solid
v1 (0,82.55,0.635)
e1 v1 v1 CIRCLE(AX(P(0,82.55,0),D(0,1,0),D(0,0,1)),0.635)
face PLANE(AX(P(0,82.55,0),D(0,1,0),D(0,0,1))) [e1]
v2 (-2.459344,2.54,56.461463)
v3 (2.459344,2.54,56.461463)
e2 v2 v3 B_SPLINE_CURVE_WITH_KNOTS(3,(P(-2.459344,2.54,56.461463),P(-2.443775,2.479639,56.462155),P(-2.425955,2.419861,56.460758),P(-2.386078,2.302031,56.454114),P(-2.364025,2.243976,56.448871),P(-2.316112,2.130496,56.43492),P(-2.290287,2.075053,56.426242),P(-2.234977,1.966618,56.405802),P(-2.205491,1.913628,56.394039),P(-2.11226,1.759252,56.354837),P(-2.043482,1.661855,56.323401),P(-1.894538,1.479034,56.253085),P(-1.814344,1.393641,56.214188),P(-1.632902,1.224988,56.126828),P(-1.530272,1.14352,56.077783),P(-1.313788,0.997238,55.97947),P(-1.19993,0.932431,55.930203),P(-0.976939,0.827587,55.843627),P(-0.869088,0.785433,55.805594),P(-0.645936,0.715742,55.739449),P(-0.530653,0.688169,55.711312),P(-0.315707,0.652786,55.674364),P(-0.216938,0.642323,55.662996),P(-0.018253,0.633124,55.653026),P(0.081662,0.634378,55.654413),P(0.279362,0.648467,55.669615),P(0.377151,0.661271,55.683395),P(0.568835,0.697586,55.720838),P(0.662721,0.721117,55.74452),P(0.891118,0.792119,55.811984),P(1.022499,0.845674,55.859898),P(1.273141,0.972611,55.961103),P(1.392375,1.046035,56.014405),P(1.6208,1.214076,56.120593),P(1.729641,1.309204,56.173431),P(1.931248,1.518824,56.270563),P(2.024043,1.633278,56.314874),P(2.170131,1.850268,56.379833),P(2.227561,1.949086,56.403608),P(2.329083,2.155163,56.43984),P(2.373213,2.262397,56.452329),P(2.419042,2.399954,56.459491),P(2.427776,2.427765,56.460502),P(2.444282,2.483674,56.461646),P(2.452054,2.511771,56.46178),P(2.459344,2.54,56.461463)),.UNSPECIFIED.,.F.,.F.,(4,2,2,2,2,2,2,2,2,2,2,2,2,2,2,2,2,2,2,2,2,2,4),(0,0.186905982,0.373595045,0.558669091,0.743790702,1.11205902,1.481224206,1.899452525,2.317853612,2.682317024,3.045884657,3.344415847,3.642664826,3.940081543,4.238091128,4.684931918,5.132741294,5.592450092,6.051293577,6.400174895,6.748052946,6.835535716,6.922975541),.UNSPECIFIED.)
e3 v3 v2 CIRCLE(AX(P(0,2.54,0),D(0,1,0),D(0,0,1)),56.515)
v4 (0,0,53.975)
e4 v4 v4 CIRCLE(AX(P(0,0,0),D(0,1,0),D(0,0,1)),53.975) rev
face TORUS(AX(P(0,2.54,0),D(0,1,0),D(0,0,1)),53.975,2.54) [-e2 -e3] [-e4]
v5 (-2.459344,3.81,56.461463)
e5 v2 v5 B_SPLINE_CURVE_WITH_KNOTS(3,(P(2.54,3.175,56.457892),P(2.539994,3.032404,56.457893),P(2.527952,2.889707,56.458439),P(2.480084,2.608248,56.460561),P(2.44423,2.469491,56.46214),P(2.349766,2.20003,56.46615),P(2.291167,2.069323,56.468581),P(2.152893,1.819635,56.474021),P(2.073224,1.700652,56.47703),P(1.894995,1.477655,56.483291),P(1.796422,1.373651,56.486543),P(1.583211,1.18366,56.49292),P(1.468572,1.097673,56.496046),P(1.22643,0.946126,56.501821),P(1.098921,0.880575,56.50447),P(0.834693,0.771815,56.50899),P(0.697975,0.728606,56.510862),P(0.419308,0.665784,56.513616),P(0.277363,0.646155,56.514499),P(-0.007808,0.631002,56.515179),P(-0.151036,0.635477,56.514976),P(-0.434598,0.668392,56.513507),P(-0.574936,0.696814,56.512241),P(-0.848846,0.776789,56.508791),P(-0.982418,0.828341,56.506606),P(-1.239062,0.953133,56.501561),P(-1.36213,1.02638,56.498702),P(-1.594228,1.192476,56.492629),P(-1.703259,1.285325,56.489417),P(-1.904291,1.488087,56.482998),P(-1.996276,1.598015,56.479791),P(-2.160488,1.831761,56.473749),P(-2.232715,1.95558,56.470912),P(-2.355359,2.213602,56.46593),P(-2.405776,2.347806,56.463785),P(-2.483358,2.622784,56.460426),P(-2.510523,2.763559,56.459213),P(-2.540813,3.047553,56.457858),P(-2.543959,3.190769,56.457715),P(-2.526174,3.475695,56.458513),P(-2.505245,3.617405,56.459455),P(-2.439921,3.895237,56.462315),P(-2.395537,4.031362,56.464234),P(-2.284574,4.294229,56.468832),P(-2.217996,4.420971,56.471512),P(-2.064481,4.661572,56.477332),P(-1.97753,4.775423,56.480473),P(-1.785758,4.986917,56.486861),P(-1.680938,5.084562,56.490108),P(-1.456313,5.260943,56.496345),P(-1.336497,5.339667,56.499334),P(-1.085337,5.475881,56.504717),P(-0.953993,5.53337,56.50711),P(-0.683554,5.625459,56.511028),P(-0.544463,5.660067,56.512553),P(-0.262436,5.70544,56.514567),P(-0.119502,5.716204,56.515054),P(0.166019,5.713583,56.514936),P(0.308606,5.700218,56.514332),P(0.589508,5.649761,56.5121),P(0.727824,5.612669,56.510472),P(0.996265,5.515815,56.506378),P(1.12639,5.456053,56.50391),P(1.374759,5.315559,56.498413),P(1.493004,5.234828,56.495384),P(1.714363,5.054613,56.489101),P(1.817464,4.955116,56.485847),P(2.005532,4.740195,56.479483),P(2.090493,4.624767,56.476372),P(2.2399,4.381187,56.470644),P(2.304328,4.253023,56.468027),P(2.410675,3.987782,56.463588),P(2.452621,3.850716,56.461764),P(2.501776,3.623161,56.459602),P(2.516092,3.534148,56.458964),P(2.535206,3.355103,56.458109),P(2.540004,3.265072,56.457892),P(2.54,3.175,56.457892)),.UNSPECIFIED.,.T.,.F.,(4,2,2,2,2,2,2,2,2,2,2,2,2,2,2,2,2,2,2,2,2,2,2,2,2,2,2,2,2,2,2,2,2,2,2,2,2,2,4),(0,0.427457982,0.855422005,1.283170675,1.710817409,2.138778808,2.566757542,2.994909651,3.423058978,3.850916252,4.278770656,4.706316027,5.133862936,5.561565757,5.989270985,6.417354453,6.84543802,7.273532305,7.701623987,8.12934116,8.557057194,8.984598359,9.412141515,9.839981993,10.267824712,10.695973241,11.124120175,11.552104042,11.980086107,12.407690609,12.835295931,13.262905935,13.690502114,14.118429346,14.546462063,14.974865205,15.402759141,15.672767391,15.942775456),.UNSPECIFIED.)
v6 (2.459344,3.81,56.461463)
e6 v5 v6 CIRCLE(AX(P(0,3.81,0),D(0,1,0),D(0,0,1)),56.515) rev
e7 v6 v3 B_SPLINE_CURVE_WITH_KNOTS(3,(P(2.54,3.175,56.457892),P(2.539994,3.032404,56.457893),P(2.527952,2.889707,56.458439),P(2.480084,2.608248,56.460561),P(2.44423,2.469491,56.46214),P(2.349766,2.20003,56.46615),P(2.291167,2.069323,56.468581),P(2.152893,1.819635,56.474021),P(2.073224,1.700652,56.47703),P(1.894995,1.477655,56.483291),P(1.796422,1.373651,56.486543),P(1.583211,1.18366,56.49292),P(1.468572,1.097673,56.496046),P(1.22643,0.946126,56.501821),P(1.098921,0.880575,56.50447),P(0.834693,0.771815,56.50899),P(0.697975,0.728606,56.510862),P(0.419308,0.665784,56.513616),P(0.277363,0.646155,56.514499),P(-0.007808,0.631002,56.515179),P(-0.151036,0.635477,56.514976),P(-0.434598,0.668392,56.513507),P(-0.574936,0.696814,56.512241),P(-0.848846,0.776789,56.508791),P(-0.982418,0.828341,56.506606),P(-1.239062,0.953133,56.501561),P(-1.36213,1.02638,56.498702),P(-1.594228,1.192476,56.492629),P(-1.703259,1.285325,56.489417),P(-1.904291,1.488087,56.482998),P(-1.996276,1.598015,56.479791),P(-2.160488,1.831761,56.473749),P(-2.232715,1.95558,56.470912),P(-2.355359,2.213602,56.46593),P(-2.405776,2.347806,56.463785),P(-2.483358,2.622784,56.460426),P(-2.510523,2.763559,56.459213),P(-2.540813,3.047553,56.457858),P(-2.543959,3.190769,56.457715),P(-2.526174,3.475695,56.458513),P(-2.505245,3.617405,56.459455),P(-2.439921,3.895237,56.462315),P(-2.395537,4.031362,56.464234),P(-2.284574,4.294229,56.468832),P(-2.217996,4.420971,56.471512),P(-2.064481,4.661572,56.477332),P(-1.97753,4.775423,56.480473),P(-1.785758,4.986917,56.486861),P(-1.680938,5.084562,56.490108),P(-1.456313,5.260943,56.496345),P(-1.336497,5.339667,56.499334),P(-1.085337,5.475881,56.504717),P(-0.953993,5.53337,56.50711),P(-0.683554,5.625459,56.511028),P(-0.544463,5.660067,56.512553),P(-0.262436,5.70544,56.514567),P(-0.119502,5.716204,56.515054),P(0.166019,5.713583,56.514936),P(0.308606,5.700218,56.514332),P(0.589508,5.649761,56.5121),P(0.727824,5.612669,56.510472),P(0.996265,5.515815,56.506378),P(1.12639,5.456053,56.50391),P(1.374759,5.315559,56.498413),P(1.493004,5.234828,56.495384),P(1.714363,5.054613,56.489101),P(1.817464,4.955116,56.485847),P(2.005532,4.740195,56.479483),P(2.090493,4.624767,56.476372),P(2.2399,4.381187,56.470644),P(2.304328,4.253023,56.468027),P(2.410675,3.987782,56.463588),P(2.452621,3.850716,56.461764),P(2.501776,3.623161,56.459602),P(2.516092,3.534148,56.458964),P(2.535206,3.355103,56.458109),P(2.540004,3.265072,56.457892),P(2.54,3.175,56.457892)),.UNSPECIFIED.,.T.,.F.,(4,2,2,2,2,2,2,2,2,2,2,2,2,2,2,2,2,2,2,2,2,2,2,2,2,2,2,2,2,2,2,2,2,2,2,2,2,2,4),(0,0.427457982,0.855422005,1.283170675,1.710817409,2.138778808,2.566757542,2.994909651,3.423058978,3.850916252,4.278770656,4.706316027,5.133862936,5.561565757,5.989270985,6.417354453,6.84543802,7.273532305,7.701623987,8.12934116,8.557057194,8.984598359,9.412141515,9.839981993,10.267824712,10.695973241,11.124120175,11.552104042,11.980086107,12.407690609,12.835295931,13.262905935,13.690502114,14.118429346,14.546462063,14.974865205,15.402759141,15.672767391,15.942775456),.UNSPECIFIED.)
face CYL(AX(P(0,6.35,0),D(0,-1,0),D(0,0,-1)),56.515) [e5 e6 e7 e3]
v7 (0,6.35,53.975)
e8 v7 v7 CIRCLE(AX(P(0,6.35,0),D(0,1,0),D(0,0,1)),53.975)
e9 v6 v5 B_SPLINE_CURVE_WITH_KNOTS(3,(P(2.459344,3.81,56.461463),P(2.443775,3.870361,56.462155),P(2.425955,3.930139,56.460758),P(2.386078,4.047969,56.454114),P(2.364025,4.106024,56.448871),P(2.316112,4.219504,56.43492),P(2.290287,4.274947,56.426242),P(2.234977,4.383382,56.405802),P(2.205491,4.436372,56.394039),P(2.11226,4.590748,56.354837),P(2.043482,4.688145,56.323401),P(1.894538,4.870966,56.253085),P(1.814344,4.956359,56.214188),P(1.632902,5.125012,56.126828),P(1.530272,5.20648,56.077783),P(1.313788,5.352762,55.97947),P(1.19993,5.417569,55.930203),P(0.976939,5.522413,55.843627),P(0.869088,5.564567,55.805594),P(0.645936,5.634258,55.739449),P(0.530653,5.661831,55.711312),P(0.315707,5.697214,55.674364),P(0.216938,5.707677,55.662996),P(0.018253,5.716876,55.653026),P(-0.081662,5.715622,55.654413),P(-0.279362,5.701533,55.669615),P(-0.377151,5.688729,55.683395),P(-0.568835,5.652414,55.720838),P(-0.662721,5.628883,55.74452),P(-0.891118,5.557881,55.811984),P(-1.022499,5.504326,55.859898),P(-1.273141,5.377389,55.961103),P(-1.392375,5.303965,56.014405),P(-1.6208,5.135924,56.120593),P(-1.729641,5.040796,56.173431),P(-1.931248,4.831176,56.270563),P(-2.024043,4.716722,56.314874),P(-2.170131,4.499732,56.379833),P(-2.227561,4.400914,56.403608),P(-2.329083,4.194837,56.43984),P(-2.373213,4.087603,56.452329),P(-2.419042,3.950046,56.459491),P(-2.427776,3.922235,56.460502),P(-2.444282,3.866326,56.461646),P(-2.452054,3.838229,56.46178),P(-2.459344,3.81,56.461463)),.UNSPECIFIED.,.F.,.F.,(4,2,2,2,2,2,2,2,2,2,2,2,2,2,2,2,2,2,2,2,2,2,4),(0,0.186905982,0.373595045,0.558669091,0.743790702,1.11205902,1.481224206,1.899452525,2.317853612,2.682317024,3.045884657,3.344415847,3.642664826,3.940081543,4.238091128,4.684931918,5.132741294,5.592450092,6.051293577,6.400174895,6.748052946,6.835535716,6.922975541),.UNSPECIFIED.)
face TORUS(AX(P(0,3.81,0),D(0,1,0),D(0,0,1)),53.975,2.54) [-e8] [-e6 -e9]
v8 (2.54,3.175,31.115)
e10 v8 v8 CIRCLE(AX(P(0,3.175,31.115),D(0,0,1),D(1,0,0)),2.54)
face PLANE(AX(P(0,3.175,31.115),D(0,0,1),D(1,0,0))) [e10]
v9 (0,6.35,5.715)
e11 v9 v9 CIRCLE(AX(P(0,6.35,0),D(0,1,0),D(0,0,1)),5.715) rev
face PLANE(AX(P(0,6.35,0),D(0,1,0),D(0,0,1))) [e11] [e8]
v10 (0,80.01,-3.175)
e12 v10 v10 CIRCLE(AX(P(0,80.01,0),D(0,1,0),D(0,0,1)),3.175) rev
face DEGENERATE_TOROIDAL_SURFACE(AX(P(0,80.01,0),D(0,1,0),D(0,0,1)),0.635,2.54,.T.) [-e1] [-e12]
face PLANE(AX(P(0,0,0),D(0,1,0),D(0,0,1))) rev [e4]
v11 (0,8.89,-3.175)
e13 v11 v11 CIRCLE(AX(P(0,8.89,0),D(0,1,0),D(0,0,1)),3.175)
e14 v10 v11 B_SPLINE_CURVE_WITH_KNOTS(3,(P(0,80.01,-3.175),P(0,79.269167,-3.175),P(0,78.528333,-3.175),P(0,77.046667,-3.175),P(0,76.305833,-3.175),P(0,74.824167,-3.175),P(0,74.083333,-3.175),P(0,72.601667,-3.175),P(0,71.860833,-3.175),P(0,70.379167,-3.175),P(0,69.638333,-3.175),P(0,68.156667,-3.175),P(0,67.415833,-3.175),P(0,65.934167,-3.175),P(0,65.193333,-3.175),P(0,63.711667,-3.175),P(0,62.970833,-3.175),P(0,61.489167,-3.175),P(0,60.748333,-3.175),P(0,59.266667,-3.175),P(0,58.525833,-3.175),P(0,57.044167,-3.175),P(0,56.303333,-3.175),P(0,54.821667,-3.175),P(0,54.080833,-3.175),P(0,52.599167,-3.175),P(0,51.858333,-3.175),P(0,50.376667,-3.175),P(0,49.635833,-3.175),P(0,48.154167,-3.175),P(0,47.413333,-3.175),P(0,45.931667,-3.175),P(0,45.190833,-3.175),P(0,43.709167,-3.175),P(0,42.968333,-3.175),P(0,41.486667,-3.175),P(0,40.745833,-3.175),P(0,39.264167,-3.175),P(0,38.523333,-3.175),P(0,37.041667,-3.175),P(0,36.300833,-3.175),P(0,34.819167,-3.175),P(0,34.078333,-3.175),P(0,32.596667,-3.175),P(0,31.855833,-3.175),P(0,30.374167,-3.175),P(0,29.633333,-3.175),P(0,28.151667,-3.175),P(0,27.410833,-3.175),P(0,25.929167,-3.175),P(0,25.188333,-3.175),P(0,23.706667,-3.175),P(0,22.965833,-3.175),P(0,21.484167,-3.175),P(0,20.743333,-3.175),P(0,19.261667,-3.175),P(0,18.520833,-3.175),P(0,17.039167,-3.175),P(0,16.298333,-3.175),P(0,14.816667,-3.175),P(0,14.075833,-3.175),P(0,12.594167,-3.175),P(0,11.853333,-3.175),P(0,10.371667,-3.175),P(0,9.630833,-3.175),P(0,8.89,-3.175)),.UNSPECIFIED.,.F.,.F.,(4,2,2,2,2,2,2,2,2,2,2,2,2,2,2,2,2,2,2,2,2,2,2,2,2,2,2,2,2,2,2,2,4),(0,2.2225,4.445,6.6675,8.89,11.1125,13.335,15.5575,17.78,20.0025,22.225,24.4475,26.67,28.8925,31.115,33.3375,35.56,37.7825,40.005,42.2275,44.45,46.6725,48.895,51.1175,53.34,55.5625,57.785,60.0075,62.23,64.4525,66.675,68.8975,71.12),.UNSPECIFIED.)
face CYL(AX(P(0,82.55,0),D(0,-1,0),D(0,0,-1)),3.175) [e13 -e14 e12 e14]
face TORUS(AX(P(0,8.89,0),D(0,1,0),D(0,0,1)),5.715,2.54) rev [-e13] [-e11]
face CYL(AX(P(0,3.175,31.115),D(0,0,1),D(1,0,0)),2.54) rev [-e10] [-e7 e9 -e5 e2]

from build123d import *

# Parameters (mm, degrees)
SKETCH1_R           = 56.515
BOSS_EXTRUDE1_DEPTH = 6.35
SKETCH2_R           = 3.175
BOSS_EXTRUDE2_DEPTH = 76.2
SKETCH5_R           = 2.54
CUT_EXTRUDE1_DEPTH  = 25.4
FILLET2_R           = 2.54


with BuildPart() as part:
    # Sketch1 → Boss-Extrude1 (new body)
    with BuildSketch(Plane(origin=(0, 0, 0), x_dir=(1, 0, 0), z_dir=(0, 1, 0))):
        with Locations(Location((0, 0, 0), (0, 0, 270))):
            Circle(SKETCH1_R)
    extrude(amount=BOSS_EXTRUDE1_DEPTH)

    # Sketch2 → Boss-Extrude2 (add)
    with BuildSketch(Plane(origin=(0, 6.35, 0), x_dir=(1, 0, 0), z_dir=(0, 1, 0))):
        with Locations(Location((0, 0, 0), (0, 0, 90))):
            Circle(SKETCH2_R)
    extrude(amount=BOSS_EXTRUDE2_DEPTH)

    # Sketch5 → Cut-Extrude1 (cut)
    with BuildSketch(Plane.XY.offset(56.515)):
        with Locations((0, 3.175)):
            Circle(SKETCH5_R)
    extrude(amount=-CUT_EXTRUDE1_DEPTH, mode=Mode.SUBTRACT)

    # Fillet2
    # the kernel refuses this fillet: 2.54 mm, written as the material it adds along each edge
    with BuildSketch(Plane(origin=(0, 6.35, 0), x_dir=(0, 0, -1), z_dir=(1, 0, 0))) as fillet2_piece_1:
        with BuildLine():
            CenterArc((3.175 + FILLET2_R, FILLET2_R), FILLET2_R, 180, 90)
            Line((3.175, FILLET2_R), (3.175, 0))
            Line((3.175, 0), (3.175 + FILLET2_R, 0))
        make_face()
    revolve(axis=Axis((0, 6.35, 0), (0, 1, 0)))
    # the kernel refuses this fillet: 2.54 mm, written as the material it takes off along each edge
    with BuildSketch(Plane(origin=(0, 82.55, 0), x_dir=(0, 0, -1), z_dir=(1, 0, 0))) as fillet2_2_piece_1:
        with BuildLine():
            CenterArc((3.175 - FILLET2_R, -FILLET2_R), FILLET2_R, 0, 90)
            Line((3.175 - FILLET2_R, 0), (3.175, 0))
            Line((3.175, 0), (3.175, -FILLET2_R))
        make_face()
    revolve(axis=Axis((0, 82.55, 0), (0, 1, 0)), mode=Mode.SUBTRACT)
    with BuildSketch(Plane(origin=(0, 0, 0), x_dir=(0, 0, 1), z_dir=(-1, 0, 0))) as fillet2_2_piece_2:
        with BuildLine():
            CenterArc((56.515 - FILLET2_R, FILLET2_R), FILLET2_R, 270, 90)
            Line((56.515 - FILLET2_R, 0), (56.515, 0))
            Line((56.515, 0), (56.515, FILLET2_R))
        make_face()
    revolve(axis=Axis((0, 0, 0), (0, 1, 0)), mode=Mode.SUBTRACT)
    with BuildSketch(Plane(origin=(0, 6.35, 0), x_dir=(0, 0, 1), z_dir=(-1, 0, 0))) as fillet2_2_piece_3:
        with BuildLine():
            CenterArc((56.515 - FILLET2_R, -FILLET2_R), FILLET2_R, 0, 90)
            Line((56.515 - FILLET2_R, 0), (56.515, 0))
            Line((56.515, 0), (56.515, -FILLET2_R))
        make_face()
    revolve(axis=Axis((0, 6.35, 0), (0, 1, 0)), mode=Mode.SUBTRACT)


solid = part.part
